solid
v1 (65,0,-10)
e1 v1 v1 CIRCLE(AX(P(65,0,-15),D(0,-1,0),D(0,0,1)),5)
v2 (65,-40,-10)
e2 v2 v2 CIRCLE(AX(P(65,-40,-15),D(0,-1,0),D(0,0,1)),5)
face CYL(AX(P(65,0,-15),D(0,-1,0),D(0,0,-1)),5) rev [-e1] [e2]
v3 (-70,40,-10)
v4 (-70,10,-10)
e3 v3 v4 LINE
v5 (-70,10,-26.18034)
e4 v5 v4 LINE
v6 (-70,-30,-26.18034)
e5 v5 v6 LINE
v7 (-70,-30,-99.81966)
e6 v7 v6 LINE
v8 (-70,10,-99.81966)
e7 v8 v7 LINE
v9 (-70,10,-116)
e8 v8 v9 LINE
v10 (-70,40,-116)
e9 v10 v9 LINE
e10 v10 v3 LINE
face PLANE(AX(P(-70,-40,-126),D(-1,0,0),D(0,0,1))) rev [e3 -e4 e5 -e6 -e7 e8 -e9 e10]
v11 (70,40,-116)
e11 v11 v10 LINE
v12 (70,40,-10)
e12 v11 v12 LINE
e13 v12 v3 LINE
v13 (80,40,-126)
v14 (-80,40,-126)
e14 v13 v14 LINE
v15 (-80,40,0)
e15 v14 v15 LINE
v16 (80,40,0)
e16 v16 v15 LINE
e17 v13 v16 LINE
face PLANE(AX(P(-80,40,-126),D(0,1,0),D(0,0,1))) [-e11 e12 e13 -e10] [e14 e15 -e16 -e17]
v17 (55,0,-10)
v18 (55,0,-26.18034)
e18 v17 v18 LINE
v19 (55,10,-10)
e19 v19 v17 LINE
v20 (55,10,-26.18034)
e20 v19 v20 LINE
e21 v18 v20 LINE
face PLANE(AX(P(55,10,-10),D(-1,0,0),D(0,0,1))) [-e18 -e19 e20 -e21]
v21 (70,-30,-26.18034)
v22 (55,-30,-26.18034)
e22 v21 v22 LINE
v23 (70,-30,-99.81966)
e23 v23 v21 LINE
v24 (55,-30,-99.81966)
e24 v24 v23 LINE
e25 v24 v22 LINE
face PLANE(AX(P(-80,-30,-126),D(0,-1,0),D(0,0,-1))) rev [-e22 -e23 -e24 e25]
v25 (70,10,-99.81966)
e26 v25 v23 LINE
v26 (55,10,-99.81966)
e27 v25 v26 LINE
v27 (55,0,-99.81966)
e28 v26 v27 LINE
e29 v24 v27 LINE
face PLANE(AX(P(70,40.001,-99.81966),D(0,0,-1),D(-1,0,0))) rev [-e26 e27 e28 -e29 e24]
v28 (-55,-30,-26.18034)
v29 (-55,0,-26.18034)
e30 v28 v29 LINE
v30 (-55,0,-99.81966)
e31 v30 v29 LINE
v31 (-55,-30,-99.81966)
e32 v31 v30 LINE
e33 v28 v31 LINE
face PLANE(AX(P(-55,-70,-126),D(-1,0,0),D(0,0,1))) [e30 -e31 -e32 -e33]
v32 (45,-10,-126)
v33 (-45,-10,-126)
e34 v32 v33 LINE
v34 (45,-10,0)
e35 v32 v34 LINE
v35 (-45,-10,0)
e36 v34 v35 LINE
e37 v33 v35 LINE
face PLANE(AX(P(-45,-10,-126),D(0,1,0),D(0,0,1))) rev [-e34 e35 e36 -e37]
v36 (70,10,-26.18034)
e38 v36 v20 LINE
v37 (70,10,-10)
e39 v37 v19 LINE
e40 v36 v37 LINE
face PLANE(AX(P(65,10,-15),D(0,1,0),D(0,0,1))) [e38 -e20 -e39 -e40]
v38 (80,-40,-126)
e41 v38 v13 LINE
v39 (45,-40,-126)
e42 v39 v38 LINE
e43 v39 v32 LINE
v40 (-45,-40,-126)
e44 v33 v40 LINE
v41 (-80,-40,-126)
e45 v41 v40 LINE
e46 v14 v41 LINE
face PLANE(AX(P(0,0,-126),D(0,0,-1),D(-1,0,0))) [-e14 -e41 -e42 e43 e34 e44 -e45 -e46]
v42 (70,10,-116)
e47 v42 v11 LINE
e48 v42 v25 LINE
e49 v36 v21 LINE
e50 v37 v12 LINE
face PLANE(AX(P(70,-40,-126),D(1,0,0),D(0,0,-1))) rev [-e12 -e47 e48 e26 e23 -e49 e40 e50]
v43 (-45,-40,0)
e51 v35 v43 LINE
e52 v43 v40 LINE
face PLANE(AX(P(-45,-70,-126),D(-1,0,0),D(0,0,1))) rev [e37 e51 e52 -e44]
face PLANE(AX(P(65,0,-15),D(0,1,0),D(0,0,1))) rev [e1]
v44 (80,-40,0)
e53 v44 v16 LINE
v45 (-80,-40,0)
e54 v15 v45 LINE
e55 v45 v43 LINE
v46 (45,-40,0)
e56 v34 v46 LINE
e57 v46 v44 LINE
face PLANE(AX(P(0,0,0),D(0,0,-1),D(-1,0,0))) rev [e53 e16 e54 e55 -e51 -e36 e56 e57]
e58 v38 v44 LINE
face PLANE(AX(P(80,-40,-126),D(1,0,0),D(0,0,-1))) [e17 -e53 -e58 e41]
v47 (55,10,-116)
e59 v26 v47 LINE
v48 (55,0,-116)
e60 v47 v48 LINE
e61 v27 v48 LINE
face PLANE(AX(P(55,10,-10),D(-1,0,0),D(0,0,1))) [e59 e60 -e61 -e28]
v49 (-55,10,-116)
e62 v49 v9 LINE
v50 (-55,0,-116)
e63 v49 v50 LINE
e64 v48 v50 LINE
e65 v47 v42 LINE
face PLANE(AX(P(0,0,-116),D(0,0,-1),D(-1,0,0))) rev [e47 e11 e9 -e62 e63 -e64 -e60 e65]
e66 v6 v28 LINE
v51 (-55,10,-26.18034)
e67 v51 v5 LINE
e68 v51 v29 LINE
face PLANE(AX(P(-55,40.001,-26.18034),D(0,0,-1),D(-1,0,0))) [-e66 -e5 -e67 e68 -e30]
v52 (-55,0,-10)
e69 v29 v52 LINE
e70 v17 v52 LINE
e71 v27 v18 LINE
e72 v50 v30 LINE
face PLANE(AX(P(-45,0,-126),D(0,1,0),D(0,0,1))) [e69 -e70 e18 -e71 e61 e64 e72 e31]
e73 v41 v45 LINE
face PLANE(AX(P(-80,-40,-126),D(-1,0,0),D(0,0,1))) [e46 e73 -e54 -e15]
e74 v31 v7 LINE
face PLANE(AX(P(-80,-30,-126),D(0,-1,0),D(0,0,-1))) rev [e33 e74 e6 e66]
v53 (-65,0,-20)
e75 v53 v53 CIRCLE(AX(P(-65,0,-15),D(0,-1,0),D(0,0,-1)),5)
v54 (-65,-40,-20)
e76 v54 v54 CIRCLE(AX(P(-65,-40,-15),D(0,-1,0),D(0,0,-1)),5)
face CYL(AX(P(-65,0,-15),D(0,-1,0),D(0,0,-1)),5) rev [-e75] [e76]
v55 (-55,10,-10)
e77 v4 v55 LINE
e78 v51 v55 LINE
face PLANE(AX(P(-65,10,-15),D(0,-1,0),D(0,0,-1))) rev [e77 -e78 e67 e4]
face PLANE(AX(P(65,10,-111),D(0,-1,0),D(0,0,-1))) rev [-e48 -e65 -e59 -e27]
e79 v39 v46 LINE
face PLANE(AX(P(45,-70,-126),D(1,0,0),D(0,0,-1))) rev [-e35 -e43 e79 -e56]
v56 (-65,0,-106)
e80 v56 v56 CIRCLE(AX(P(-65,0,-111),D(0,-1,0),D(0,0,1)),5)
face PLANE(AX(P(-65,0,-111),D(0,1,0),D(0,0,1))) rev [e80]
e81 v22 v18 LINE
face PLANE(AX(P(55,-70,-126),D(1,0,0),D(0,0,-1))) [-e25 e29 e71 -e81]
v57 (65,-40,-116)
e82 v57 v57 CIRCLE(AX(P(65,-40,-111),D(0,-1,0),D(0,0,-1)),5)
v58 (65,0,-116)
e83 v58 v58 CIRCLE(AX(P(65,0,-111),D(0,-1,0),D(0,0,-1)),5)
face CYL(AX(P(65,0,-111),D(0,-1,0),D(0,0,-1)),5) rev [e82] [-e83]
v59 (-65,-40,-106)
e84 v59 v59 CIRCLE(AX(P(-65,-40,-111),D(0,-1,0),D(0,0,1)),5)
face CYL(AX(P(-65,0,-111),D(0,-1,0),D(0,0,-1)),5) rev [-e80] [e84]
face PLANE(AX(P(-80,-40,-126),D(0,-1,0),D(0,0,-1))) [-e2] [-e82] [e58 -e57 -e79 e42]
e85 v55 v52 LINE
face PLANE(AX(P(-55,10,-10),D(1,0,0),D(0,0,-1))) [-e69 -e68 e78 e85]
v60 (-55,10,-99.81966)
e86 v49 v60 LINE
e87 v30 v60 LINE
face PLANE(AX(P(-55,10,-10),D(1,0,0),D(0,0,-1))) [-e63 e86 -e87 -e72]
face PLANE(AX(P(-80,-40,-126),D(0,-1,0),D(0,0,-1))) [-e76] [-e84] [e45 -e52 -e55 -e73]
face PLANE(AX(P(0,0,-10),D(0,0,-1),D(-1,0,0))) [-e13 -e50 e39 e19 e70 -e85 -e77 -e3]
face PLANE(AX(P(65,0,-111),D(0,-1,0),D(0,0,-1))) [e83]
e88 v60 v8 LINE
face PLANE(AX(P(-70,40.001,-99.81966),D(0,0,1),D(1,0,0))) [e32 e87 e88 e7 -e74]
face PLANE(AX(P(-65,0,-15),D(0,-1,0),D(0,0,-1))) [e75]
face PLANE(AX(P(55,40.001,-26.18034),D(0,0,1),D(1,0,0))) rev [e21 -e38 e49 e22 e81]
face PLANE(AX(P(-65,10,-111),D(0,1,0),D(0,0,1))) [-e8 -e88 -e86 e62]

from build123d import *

# Parameters (mm, degrees)
SKETCH1_W           = 160
SKETCH1_H           = 80
BOSS_EXTRUDE1_DEPTH = 126
SKETCH2_W           = 90
SKETCH2_H           = 60
CUT_EXTRUDE1_DEPTH  = 126
SKETCH3_R           = 5
CUT_EXTRUDE2_DEPTH  = 40
SHELL1_DEPTH        = 40
SHELL1_START        = -30
SHELL1_2_DEPTH      = 30
SHELL1_START_2      = 10
SHELL1_3_DEPTH      = 30
SKETCH4_W           = 110
SKETCH4_H           = 106
CUT_EXTRUDE3_DEPTH  = 10
SKETCH5_W           = 15
SKETCH5_H           = 73.639320226
CUT_EXTRUDE4_DEPTH  = 40


# Read off the part's stored shape, not the designer's step: Shell1
with BuildPart() as part:
    # Sketch1 → Boss-Extrude1 (new body)
    with BuildSketch(Plane.XY):
        Rectangle(SKETCH1_W, SKETCH1_H)
    extrude(amount=-BOSS_EXTRUDE1_DEPTH)

    # Sketch2 → Cut-Extrude1 (cut)
    with BuildSketch(Plane.XY):
        with Locations((0, -40)):
            Rectangle(SKETCH2_W, SKETCH2_H)
    extrude(amount=-CUT_EXTRUDE1_DEPTH, mode=Mode.SUBTRACT)

    # Sketch3 → Cut-Extrude2 (cut)
    with BuildSketch(Plane.XZ.offset(40)):
        with Locations(Location((-65, -15, 0), (0, 0, 270))):
            Circle(SKETCH3_R)
        with Locations(Location((65, -15, 0), (0, 0, 90))):
            Circle(SKETCH3_R)
        with Locations(Location((65, -111, 0), (0, 0, 270))):
            Circle(SKETCH3_R)
        with Locations(Location((-65, -111, 0), (0, 0, 90))):
            Circle(SKETCH3_R)
    extrude(amount=-CUT_EXTRUDE2_DEPTH, mode=Mode.SUBTRACT)

    # Shell1 outline → Shell1 (cut)
    with BuildSketch(Plane(origin=(0, 0, 0), x_dir=(1, 0, 0), z_dir=(0, 1, 0))):
        with BuildLine():
            Line((70, 29.142135624), (70, 96.857864376))
            ThreePointArc((70, 96.857864376), (54.393398282, 100.393398282), (50.857864376, 116))
            Line((50.857864376, 116), (-50.857864376, 116))
            ThreePointArc((-50.857864376, 116), (-54.393398282, 100.393398282), (-70, 96.857864376))
            Line((-70, 96.857864376), (-70, 29.142135624))
            ThreePointArc((-70, 29.142135624), (-54.393398282, 25.606601718), (-50.857864376, 10))
            Line((-50.857864376, 10), (50.857864376, 10))
            ThreePointArc((50.857864376, 10), (54.393398282, 25.606601718), (70, 29.142135624))
        make_face()
    extrude(amount=SHELL1_DEPTH, mode=Mode.SUBTRACT)

    # Shell1 2 outline → Shell1 2 (cut)
    with BuildSketch(Plane(origin=(0, 0, 0), x_dir=(1, 0, 0), z_dir=(0, 1, 0)).offset(SHELL1_START)):
        with BuildLine():
            ThreePointArc((55, 26.180339887), (62.094305849, 29.715873794), (70, 29.142135624))
            Line((70, 29.142135624), (70, 96.857864376))
            ThreePointArc((70, 96.857864376), (62.094305849, 96.284126206), (55, 99.819660113))
            Line((55, 99.819660113), (55, 26.180339887))
        make_face()
        with BuildLine():
            ThreePointArc((-70, 29.142135624), (-62.094305849, 29.715873794), (-55, 26.180339887))
            Line((-55, 26.180339887), (-55, 99.819660113))
            ThreePointArc((-55, 99.819660113), (-62.094305849, 96.284126206), (-70, 96.857864376))
            Line((-70, 96.857864376), (-70, 29.142135624))
        make_face()
    extrude(amount=SHELL1_2_DEPTH, mode=Mode.SUBTRACT)

    # Shell1 3 outline → Shell1 3 (cut)
    with BuildSketch(Plane(origin=(0, 0, 0), x_dir=(1, 0, 0), z_dir=(0, 1, 0)).offset(SHELL1_START_2)):
        with BuildLine():
            Line((50.857864376, 10), (70, 10))
            Line((70, 10), (70, 29.142135624))
            ThreePointArc((70, 29.142135624), (54.393398282, 25.606601718), (50.857864376, 10))
        make_face()
        with BuildLine():
            ThreePointArc((50.857864376, 116), (54.393398282, 100.393398282), (70, 96.857864376))
            Line((70, 96.857864376), (70, 116))
            Line((70, 116), (50.857864376, 116))
        make_face()
        with BuildLine():
            Line((-70, 10), (-50.857864376, 10))
            ThreePointArc((-50.857864376, 10), (-54.393398282, 25.606601718), (-70, 29.142135624))
            Line((-70, 29.142135624), (-70, 10))
        make_face()
        with BuildLine():
            ThreePointArc((-70, 96.857864376), (-54.393398282, 100.393398282), (-50.857864376, 116))
            Line((-50.857864376, 116), (-70, 116))
            Line((-70, 116), (-70, 96.857864376))
        make_face()
    extrude(amount=SHELL1_3_DEPTH, mode=Mode.SUBTRACT)

    # Sketch4 → Cut-Extrude3 (cut)
    with BuildSketch(Plane(origin=(0, 0, 0), x_dir=(1, 0, 0), z_dir=(0, 1, 0))):
        with Locations((0, 63)):
            Rectangle(SKETCH4_W, SKETCH4_H)
    extrude(amount=CUT_EXTRUDE3_DEPTH, mode=Mode.SUBTRACT)

    # Sketch5 → Cut-Extrude4 (cut)
    with BuildSketch(Plane(origin=(0, -30, 0), x_dir=(1, 0, 0), z_dir=(0, 1, 0))):
        with Locations((-62.5, 63)):
            Rectangle(SKETCH5_W, SKETCH5_H)
    cut_extrude4 = extrude(amount=CUT_EXTRUDE4_DEPTH, mode=Mode.SUBTRACT)

    # Mirror1: Cut-Extrude4 across plane
    add(cut_extrude4.mirror(Plane(origin=(0, 0, 0), x_dir=(0, 0, 1), z_dir=(1, 0, 0))), mode=Mode.SUBTRACT)


solid = part.part
